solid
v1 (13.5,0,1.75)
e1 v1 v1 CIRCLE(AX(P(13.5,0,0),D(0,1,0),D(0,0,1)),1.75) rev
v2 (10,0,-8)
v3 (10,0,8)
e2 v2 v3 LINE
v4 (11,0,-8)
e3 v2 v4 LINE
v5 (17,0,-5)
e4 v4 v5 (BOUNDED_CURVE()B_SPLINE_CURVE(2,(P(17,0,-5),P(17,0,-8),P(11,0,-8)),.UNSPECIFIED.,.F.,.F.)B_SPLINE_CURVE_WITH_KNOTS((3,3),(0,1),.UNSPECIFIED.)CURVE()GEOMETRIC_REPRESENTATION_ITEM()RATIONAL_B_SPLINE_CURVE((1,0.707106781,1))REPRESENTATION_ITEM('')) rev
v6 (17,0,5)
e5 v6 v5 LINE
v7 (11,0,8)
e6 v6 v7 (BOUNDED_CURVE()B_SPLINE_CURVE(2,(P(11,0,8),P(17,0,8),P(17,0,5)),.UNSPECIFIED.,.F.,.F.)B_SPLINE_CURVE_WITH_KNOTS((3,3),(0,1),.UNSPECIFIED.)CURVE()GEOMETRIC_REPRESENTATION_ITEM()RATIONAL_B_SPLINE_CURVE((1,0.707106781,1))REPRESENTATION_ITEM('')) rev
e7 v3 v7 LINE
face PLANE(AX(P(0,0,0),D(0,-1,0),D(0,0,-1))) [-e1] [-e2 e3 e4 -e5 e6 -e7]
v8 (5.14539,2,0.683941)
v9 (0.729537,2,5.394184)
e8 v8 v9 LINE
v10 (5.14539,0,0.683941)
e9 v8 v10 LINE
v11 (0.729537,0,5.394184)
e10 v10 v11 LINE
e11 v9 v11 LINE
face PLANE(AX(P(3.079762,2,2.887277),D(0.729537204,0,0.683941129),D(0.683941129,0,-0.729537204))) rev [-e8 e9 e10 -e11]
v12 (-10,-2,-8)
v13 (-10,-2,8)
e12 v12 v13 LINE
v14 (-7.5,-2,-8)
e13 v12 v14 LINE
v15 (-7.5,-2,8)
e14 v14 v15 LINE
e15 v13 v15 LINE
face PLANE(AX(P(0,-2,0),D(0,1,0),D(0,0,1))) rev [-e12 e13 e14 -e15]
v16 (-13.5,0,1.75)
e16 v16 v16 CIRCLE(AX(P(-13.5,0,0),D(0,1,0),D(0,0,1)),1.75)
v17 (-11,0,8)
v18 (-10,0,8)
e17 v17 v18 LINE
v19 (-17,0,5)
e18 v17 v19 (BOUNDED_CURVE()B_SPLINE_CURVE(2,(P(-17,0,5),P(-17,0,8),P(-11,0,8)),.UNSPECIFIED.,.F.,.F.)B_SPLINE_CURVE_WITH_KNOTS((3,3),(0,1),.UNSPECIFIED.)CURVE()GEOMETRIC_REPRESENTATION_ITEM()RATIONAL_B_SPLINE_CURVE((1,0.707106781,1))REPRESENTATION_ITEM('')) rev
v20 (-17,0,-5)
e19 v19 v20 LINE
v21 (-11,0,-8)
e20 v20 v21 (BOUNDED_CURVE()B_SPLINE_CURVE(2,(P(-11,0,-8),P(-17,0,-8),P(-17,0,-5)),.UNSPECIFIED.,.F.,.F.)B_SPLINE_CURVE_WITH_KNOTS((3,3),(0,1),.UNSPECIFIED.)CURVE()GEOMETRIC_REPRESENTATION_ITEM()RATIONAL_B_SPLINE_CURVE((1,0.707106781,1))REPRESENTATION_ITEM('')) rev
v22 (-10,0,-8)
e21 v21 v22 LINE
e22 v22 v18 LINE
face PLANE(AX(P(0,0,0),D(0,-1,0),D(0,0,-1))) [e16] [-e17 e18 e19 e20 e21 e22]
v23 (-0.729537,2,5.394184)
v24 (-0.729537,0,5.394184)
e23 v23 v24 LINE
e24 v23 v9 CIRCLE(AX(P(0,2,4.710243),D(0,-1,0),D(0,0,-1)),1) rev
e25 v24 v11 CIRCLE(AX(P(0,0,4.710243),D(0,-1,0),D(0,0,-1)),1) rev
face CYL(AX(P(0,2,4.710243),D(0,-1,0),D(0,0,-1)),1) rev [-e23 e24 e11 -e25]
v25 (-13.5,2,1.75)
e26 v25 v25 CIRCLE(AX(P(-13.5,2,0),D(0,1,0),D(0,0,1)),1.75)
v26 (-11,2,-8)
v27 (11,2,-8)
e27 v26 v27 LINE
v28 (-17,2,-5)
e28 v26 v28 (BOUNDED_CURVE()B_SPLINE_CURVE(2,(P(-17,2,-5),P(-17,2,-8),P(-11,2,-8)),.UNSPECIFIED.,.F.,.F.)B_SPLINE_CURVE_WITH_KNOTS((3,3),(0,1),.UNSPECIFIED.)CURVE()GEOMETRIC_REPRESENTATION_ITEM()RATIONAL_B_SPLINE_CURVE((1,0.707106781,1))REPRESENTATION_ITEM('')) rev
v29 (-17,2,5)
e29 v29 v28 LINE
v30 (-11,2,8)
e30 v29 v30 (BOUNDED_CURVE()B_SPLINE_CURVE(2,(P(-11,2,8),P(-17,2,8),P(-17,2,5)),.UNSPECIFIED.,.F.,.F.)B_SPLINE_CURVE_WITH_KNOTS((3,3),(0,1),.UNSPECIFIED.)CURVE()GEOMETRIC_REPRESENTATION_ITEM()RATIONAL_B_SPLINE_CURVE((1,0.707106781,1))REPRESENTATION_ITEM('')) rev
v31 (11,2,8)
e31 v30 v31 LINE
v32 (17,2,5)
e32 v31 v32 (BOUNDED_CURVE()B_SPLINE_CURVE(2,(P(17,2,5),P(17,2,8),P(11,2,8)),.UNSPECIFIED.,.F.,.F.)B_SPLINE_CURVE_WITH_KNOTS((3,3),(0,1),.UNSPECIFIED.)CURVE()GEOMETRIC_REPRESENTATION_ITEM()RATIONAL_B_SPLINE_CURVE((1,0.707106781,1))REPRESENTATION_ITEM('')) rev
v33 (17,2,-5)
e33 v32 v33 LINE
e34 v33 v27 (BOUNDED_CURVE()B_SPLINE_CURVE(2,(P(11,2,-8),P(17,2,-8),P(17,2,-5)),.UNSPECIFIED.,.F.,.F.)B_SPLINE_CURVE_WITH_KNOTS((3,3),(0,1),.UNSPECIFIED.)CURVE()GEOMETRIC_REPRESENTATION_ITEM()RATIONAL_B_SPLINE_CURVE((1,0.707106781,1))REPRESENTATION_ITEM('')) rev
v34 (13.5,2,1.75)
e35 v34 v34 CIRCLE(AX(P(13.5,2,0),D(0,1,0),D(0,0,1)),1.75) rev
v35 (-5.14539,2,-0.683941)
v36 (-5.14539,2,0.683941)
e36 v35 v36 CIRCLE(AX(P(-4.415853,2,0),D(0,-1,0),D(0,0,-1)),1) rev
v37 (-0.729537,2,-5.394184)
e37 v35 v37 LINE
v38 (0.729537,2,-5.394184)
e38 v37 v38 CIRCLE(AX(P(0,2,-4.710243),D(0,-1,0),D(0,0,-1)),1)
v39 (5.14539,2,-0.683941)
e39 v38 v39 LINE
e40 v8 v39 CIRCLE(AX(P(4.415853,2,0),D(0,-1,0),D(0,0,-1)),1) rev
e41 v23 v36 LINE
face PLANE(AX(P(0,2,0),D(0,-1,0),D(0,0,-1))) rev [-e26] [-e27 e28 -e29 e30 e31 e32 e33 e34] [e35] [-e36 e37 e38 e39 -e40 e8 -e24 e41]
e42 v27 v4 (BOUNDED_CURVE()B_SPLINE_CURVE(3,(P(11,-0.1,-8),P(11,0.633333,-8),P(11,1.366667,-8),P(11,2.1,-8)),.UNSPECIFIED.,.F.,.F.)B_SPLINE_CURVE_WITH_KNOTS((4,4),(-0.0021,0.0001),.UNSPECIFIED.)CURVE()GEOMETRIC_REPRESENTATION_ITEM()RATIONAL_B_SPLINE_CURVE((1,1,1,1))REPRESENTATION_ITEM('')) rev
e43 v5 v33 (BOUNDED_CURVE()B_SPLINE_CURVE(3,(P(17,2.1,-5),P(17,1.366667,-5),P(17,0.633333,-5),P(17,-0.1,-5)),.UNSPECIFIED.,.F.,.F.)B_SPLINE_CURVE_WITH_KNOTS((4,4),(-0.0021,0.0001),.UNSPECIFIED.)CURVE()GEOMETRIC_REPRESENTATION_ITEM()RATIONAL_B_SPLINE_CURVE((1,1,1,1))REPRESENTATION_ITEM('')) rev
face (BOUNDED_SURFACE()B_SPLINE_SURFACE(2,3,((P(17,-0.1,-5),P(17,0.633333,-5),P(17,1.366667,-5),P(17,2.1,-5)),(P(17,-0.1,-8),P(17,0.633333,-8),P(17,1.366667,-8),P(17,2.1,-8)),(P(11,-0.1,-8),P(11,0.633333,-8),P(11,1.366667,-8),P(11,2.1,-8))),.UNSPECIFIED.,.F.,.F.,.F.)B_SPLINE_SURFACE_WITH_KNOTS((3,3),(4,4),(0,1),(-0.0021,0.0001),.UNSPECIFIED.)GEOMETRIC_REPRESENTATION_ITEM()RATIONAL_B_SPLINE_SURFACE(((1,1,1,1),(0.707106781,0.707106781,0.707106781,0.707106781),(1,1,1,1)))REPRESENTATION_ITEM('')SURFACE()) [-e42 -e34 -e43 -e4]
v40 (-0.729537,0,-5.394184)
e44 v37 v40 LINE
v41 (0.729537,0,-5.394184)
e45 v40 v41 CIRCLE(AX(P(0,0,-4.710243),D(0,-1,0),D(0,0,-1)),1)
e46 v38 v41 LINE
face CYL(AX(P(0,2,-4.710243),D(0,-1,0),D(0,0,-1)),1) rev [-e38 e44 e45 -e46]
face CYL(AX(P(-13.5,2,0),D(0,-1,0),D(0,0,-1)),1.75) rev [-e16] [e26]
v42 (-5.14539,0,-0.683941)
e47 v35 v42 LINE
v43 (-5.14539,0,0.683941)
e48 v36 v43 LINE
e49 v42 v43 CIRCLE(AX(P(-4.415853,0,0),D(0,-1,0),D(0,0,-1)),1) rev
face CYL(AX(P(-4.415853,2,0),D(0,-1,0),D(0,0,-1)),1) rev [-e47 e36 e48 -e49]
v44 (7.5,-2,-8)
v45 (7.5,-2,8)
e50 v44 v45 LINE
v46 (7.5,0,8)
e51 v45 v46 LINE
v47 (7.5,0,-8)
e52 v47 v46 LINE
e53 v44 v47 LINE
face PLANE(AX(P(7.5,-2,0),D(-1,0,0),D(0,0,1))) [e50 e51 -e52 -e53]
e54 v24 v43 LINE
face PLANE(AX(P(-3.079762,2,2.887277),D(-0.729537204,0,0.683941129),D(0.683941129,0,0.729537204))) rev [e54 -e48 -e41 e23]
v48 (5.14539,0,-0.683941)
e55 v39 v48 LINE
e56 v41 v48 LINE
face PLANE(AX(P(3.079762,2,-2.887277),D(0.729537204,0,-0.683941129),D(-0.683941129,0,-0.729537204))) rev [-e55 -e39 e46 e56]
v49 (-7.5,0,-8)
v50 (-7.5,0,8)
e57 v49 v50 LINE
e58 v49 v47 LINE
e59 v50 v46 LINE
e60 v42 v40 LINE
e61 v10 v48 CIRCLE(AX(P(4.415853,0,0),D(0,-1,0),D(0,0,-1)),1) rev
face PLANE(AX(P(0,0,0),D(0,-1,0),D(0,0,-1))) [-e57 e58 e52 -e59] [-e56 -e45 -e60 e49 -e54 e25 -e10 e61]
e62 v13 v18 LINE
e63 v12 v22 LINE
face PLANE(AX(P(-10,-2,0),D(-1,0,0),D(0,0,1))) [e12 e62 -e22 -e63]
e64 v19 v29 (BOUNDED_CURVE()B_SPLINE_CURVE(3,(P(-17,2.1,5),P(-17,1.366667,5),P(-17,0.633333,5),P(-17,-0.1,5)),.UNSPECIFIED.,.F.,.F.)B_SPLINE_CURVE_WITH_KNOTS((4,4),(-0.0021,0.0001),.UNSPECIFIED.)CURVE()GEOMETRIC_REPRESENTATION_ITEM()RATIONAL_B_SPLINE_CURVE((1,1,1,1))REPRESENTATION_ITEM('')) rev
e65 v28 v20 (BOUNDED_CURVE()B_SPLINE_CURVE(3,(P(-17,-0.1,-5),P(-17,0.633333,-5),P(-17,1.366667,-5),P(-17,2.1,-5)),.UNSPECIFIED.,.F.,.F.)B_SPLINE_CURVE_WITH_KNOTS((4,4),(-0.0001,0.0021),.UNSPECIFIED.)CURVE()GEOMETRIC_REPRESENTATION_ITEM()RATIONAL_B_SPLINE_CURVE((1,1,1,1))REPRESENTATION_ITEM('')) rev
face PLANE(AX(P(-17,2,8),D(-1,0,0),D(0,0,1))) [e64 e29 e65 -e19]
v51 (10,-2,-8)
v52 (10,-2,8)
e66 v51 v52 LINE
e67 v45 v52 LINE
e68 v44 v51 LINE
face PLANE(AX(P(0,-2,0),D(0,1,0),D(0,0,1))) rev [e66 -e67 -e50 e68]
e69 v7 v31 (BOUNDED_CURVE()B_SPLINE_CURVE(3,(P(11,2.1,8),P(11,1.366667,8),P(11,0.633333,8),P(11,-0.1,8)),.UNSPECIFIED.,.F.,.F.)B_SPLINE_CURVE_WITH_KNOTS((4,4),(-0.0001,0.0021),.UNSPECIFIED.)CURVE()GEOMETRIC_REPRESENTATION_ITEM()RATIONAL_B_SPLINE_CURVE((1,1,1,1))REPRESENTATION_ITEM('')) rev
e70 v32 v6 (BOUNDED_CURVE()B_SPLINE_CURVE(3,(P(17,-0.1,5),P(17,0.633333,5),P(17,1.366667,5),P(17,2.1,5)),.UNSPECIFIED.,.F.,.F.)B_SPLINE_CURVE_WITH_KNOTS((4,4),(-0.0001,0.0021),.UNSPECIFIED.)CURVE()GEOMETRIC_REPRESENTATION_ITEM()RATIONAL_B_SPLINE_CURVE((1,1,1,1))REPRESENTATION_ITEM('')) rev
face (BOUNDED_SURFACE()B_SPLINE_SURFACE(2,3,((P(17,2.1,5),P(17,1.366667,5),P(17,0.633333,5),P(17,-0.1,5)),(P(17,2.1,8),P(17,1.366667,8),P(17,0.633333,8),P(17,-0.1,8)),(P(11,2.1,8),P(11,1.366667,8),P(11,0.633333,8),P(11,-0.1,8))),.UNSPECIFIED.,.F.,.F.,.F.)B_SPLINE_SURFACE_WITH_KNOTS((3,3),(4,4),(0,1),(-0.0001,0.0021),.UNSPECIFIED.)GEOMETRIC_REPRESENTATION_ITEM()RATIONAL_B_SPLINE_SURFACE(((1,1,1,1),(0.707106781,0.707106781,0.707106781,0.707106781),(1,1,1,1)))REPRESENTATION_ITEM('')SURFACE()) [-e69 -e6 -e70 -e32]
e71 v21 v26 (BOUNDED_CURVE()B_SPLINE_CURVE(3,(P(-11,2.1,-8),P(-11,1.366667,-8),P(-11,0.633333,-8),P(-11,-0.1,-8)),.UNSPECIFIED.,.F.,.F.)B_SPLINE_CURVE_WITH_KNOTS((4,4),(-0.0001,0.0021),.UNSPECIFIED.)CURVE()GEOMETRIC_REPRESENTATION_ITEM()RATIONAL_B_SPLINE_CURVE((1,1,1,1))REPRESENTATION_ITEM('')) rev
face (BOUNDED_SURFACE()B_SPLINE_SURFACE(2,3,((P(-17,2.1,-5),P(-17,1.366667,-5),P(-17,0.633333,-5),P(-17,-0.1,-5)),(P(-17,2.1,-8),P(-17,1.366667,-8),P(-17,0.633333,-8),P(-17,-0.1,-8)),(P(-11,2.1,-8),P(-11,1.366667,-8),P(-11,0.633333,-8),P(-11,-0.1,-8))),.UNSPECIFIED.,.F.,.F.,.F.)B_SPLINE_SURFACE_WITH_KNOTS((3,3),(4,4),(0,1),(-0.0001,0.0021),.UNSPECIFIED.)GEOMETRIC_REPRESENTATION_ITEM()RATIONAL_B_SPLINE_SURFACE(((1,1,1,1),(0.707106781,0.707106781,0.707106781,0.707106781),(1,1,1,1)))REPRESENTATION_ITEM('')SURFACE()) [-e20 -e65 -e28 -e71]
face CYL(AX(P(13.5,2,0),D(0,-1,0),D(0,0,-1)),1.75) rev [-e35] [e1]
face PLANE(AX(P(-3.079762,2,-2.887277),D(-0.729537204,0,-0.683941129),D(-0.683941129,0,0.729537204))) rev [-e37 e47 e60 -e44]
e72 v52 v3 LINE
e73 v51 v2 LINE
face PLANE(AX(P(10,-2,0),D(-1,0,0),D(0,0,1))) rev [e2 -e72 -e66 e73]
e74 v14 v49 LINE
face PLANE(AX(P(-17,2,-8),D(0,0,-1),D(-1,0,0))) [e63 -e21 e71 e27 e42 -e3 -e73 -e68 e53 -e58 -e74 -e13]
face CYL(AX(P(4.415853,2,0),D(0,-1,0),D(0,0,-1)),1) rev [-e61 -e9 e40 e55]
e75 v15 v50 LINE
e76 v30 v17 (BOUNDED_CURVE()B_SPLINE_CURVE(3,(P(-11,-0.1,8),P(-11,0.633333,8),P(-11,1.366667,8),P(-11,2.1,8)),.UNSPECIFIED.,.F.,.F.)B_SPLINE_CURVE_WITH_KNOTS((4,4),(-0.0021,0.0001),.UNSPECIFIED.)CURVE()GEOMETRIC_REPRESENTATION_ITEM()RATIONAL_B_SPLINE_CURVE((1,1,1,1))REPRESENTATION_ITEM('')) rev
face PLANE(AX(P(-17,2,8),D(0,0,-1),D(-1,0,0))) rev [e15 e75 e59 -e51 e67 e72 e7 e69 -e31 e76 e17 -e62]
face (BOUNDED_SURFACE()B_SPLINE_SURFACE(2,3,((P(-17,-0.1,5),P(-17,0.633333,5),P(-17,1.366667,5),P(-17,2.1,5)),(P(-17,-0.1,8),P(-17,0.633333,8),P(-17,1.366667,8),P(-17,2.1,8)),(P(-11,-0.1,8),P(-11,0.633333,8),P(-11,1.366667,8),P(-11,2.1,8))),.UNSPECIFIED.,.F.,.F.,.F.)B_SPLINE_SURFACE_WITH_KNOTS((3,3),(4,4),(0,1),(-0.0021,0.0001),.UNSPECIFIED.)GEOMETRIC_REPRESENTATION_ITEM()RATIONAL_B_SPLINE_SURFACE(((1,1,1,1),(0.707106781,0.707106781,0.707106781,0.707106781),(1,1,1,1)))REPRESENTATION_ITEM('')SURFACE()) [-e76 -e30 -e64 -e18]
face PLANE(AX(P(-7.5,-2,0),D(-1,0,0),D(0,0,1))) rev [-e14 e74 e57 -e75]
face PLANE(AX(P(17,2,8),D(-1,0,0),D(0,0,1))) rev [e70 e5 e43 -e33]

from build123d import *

# Parameters (mm, degrees)
SKETCH1_W           = 34
SKETCH1_H           = 16
SKETCH1_R           = 1.75
BOSS_EXTRUDE1_DEPTH = 2
SKETCH1_3_W         = 2.5
SKETCH1_3_H         = 16
BOSS_EXTRUDE2_DEPTH = 2
CUT_EXTRUDE2_DEPTH  = 19.894443628
FILLET1_SIZE        = 6
FILLET1_SIZE_2      = 3
FILLET2_SIZE        = 6
FILLET2_SIZE_2      = 3


with BuildPart() as part:
    # Sketch1 → Boss-Extrude1 (new body)
    with BuildSketch(Plane(origin=(0, 0, 0), x_dir=(1, 0, 0), z_dir=(0, 1, 0))):
        Rectangle(SKETCH1_W, SKETCH1_H)
        with Locations(Location((-13.5, 0, 0), (0, 0, 270))):
            Circle(SKETCH1_R, mode=Mode.SUBTRACT)
        with Locations(Location((13.5, 0, 0), (0, 0, 270))):
            Circle(SKETCH1_R, mode=Mode.SUBTRACT)
    extrude(amount=BOSS_EXTRUDE1_DEPTH)

    # Sketch1<3> → Boss-Extrude2 (add)
    with BuildSketch(Plane(origin=(0, 0, 0), x_dir=(1, 0, 0), z_dir=(0, 1, 0))):
        with Locations((-8.75, 0)):
            Rectangle(SKETCH1_3_W, SKETCH1_3_H)
        with Locations((8.75, 0)):
            Rectangle(SKETCH1_3_W, SKETCH1_3_H)
    extrude(amount=-BOSS_EXTRUDE2_DEPTH)

    # Sketch2 → Cut-Extrude2 (cut, through all)
    with BuildSketch(Plane.XZ):
        with BuildLine():
            ThreePointArc((-5.145390176, -0.683941129), (-5.415852972, 0), (-5.145390176, 0.683941129))
            Line((-5.145390176, 0.683941129), (-0.729537204, 5.394184299))
            ThreePointArc((-0.729537204, 5.394184299), (0, 5.71024317), (0.729537204, 5.394184299))
            Line((0.729537204, 5.394184299), (5.145390176, 0.683941129))
            ThreePointArc((5.145390176, 0.683941129), (5.415852972, 0), (5.145390176, -0.683941129))
            Line((5.145390176, -0.683941129), (0.729537204, -5.394184299))
            ThreePointArc((0.729537204, -5.394184299), (0, -5.71024317), (-0.729537204, -5.394184299))
            Line((-0.729537204, -5.394184299), (-5.145390176, -0.683941129))
        make_face()
    extrude(amount=-CUT_EXTRUDE2_DEPTH, mode=Mode.SUBTRACT)

    # Fillet1
    # an asymmetric fillet: 6, 3 mm, written as the material it takes off along each edge
    with BuildSketch(Plane(origin=(17, -15, 8), x_dir=(-1, 0, 0), z_dir=(0, 1, 0))) as fillet1_piece_1:
        with BuildLine():
            Bezier((FILLET1_SIZE, 0), (0, 0), (0, -FILLET1_SIZE_2), weights=[1, 0.707106781, 1])
            Line((0, -FILLET1_SIZE_2), (0, 0))
            Line((0, 0), (FILLET1_SIZE, 0))
        make_face()
    extrude(amount=32, mode=Mode.SUBTRACT)
    with BuildSketch(Plane(origin=(-17, -15, -8), x_dir=(0, 0, 1), z_dir=(0, 1, 0))) as fillet1_piece_2:
        with BuildLine():
            Bezier((FILLET1_SIZE_2, 0), (0, 0), (0, FILLET1_SIZE), weights=[1, 0.707106781, 1])
            Line((0, FILLET1_SIZE), (0, 0))
            Line((0, 0), (FILLET1_SIZE_2, 0))
        make_face()
    extrude(amount=32, mode=Mode.SUBTRACT)

    # Fillet2
    # an asymmetric fillet: 6, 3 mm, written as the material it takes off along each edge
    with BuildSketch(Plane(origin=(17, -15, -8), x_dir=(-1, 0, 0), z_dir=(0, 1, 0)), Plane(origin=(-17, -15, 8), x_dir=(1, 0, 0), z_dir=(0, 1, 0))) as fillet2_piece_1:
        with BuildLine():
            Bezier((FILLET2_SIZE, 0), (0, 0), (0, FILLET2_SIZE_2), weights=[1, 0.707106781, 1])
            Line((0, FILLET2_SIZE_2), (0, 0))
            Line((0, 0), (FILLET2_SIZE, 0))
        make_face()
    extrude(amount=32, mode=Mode.SUBTRACT)


solid = part.part
